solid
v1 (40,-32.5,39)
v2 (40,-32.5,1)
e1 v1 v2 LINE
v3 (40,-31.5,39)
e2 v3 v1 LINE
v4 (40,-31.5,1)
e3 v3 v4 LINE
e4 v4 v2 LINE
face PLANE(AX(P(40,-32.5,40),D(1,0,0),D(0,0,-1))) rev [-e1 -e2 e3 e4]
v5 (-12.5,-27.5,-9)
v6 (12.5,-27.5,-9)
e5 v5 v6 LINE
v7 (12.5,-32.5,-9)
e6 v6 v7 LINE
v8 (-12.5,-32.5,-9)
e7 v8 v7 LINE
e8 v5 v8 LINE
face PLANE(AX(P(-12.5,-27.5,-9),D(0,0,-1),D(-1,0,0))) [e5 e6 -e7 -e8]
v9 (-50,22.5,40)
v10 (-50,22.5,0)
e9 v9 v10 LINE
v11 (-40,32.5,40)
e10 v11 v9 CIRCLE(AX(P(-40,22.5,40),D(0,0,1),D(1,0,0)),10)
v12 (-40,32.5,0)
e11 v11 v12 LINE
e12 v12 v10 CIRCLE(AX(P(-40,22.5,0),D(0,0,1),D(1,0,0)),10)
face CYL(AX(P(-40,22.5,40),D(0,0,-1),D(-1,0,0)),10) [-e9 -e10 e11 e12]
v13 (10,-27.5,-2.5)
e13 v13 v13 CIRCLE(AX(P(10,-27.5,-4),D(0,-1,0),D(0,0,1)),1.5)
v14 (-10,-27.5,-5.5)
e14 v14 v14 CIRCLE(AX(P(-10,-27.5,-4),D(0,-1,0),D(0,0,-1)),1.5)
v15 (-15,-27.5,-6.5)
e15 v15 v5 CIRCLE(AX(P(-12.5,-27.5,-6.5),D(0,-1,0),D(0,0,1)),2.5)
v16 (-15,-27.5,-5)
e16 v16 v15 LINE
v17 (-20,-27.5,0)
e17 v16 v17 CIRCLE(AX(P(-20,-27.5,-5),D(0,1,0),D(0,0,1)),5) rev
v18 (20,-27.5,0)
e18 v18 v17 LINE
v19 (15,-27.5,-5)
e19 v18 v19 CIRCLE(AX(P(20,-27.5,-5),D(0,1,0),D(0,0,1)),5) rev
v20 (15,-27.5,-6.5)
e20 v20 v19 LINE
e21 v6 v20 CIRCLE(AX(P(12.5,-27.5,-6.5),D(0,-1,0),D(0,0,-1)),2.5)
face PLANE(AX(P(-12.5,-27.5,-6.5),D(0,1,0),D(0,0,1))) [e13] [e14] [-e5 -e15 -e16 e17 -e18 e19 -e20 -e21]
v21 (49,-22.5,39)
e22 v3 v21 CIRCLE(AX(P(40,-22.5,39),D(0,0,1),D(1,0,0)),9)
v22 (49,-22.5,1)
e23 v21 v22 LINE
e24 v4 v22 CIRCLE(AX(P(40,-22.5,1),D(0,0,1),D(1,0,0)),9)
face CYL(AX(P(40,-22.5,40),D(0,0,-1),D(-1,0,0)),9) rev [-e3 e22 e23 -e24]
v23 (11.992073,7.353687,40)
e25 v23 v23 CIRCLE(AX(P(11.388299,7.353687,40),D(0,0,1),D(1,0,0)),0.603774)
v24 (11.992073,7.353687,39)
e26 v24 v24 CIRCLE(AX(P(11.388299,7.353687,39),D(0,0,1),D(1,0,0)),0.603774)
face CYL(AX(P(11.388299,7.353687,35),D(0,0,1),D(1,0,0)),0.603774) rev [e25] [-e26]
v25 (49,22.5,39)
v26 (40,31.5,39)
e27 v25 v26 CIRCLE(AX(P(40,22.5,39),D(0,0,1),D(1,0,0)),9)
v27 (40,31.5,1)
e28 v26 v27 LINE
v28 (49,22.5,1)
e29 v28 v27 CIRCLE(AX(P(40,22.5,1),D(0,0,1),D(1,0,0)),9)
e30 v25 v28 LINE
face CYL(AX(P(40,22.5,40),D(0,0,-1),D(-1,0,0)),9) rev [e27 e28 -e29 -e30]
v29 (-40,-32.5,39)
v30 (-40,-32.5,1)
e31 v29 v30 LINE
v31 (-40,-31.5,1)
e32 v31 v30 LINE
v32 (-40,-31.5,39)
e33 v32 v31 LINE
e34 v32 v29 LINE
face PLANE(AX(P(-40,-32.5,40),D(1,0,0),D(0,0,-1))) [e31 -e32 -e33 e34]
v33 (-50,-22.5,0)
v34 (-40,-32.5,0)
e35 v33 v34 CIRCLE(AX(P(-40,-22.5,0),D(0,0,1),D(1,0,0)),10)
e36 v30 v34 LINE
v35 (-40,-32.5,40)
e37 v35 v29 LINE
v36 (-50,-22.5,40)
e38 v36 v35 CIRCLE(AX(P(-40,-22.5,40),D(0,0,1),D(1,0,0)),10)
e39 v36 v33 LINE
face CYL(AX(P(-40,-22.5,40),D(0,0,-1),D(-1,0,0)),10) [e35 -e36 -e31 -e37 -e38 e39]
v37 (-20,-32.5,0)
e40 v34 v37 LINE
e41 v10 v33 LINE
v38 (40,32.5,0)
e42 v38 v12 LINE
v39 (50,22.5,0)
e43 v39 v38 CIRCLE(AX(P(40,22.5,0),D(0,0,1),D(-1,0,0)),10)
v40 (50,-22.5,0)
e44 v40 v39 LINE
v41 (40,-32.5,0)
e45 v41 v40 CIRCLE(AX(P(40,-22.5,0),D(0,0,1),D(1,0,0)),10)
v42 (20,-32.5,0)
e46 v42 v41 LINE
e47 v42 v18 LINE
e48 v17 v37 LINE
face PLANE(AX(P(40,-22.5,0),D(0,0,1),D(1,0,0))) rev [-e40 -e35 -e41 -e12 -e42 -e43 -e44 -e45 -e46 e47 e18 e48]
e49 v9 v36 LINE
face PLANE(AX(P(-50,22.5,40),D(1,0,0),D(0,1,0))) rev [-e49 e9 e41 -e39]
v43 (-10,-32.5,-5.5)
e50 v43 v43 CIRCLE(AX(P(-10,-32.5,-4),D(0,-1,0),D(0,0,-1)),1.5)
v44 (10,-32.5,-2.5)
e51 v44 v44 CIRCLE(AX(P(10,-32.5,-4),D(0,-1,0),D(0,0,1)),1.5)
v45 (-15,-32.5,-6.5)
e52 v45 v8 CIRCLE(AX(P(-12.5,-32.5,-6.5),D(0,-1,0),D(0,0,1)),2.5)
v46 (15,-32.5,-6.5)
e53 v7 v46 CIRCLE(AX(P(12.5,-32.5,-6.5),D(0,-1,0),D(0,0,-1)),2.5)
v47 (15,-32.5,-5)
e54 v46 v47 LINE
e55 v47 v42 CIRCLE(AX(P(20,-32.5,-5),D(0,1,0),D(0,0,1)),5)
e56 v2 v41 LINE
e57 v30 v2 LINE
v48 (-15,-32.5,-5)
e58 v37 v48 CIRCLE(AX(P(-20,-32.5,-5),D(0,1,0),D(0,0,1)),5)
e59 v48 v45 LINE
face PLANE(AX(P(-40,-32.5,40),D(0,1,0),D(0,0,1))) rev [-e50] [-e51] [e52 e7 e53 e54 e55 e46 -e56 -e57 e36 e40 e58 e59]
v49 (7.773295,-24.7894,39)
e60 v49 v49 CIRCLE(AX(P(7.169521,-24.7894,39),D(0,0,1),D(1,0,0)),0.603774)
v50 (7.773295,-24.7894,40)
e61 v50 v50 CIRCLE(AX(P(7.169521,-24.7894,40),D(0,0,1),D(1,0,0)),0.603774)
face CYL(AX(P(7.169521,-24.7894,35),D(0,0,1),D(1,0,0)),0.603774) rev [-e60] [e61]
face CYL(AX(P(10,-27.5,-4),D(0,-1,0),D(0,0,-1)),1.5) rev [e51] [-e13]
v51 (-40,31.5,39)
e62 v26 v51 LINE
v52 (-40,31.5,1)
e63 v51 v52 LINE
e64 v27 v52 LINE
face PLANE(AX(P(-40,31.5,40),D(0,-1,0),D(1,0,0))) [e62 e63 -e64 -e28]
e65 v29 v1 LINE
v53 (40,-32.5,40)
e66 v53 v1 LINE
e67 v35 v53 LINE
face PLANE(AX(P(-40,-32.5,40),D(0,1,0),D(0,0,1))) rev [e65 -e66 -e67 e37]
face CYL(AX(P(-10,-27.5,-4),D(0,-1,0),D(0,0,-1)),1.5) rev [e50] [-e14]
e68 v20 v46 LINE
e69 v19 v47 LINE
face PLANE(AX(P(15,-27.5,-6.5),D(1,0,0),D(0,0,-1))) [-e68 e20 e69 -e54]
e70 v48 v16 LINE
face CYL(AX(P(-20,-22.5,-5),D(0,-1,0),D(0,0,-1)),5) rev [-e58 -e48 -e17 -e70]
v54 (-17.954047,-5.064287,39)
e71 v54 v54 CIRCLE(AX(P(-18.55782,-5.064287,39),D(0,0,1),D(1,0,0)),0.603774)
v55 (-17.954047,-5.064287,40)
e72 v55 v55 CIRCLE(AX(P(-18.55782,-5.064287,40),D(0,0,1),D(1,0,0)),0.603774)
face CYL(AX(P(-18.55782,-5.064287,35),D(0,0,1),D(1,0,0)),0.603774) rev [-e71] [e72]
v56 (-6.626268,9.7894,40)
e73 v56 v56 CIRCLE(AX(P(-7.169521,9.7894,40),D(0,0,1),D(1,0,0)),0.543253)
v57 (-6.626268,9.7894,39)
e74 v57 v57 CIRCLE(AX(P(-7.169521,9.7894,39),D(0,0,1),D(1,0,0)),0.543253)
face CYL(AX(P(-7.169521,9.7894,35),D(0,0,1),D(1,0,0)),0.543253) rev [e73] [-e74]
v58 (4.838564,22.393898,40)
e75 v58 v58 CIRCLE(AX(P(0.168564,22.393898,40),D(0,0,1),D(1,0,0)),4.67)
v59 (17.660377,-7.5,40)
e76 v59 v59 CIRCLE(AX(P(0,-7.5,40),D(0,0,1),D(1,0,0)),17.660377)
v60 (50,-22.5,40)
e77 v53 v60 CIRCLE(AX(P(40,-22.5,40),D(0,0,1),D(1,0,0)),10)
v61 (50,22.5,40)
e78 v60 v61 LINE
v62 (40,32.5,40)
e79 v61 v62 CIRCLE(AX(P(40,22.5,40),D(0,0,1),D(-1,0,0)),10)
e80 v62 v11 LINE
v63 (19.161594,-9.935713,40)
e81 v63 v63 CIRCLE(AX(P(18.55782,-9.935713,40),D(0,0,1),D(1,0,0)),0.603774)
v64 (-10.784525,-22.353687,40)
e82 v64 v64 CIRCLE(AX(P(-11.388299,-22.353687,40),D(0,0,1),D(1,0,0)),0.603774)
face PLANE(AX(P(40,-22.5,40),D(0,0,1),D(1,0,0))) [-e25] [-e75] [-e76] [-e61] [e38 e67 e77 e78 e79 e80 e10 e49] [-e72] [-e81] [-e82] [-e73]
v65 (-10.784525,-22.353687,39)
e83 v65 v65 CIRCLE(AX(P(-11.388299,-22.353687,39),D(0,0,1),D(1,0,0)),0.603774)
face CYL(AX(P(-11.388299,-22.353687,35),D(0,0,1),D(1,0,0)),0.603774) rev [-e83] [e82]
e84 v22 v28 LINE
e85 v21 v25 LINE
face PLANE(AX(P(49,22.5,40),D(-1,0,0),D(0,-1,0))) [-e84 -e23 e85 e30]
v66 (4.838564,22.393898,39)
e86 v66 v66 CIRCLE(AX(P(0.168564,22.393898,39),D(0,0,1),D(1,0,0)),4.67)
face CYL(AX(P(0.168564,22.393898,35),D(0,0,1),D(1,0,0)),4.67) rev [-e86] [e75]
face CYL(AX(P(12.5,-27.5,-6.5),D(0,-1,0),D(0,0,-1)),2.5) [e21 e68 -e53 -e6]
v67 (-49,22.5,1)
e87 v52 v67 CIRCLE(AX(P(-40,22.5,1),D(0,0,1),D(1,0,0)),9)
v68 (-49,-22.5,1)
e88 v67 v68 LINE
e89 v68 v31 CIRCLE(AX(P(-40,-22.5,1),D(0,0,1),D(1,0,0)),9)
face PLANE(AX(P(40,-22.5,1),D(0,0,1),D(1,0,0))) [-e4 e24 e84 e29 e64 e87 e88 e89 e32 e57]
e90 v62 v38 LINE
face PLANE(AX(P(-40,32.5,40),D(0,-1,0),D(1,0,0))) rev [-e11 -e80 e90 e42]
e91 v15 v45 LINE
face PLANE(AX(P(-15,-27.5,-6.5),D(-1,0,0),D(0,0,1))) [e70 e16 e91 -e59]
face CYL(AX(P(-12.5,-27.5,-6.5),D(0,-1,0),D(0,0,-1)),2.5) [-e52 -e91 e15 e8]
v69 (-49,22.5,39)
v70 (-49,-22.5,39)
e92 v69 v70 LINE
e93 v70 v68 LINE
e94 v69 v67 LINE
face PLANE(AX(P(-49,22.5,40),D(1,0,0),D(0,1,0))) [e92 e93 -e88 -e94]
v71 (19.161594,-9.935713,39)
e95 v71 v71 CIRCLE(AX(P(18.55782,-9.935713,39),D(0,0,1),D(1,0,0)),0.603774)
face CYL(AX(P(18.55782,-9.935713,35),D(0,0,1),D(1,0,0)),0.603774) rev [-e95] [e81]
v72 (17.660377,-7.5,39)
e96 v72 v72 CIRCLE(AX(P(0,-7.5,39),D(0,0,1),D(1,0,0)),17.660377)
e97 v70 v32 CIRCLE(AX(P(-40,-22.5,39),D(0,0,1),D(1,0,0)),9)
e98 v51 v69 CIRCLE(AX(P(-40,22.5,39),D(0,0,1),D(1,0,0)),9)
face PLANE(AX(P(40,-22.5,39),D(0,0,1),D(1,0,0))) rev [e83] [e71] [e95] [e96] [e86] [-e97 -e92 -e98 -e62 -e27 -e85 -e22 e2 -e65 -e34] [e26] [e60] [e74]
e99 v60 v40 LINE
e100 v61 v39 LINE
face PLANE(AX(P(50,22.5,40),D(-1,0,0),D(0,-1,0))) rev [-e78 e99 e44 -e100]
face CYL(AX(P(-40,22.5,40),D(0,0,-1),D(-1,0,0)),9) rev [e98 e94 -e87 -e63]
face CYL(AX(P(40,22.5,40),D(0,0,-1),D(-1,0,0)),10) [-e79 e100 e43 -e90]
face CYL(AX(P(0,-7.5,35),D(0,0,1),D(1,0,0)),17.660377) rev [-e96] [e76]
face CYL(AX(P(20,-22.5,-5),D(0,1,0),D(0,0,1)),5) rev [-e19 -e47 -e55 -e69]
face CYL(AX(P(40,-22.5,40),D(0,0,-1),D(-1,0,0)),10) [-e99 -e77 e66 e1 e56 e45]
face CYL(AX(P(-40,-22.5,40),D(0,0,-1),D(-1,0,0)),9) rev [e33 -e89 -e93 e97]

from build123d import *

# Parameters (mm, degrees)
BOSS_EXTRU_1_DEPTH      = 40
COQUE1_START            = 1
COQUE1_DEPTH            = 38
ESQUISSE2_R             = 4.67
ESQUISSE2_R_2           = 17.660377339
ESQUISSE2_R_3           = 0.603773585
ESQUISSE2_R_4           = 0.543253327
ENL_V_MAT_EXTRU_1_DEPTH = 5
ESQUISSE3_R             = 1.5
BOSS_EXTRU_2_DEPTH      = 5
CONG_1_R                = 5


# Read off the part's stored shape, not the designer's step: Coque1
with BuildPart() as part:
    # Esquisse1 → Boss.-Extru.1 (new body)
    with BuildSketch(Plane.XY):
        with BuildLine():
            Line((-40, 32.5), (40, 32.5))
            ThreePointArc((40, 32.5), (47.071067812, 29.571067812), (50, 22.5))
            Line((50, 22.5), (50, -22.5))
            ThreePointArc((50, -22.5), (47.071067812, -29.571067812), (40, -32.5))
            Line((40, -32.5), (-40, -32.5))
            ThreePointArc((-40, -32.5), (-47.071067812, -29.571067812), (-50, -22.5))
            Line((-50, -22.5), (-50, 22.5))
            ThreePointArc((-50, 22.5), (-47.071067812, 29.571067812), (-40, 32.5))
        make_face()
    extrude(amount=BOSS_EXTRU_1_DEPTH)

    # Coque1 outline → Coque1 (cut)
    with BuildSketch(Plane.XY.offset(COQUE1_START)):
        with BuildLine():
            Line((-40, -31.5), (-40, -32.5))
            Line((-40, -32.5), (40, -32.5))
            Line((40, -32.5), (40, -31.5))
            ThreePointArc((40, -31.5), (46.363961031, -28.863961031), (49, -22.5))
            Line((49, -22.5), (49, 22.5))
            ThreePointArc((49, 22.5), (46.363961031, 28.863961031), (40, 31.5))
            Line((40, 31.5), (-40, 31.5))
            ThreePointArc((-40, 31.5), (-46.363961031, 28.863961031), (-49, 22.5))
            Line((-49, 22.5), (-49, -22.5))
            ThreePointArc((-49, -22.5), (-46.363961031, -28.863961031), (-40, -31.5))
        make_face()
    extrude(amount=COQUE1_DEPTH, mode=Mode.SUBTRACT)

    # Esquisse2 → Enlèv. mat.-Extru.1 (cut)
    with BuildSketch(Plane.XY.offset(40)):
        with Locations((0.168563894, 22.39389783)):
            Circle(ESQUISSE2_R)
        with Locations((-2.4e-08, -7.499999903)):
            Circle(ESQUISSE2_R_2)
        with Locations((-18.557820098, -5.064287395)):
            Circle(ESQUISSE2_R_3)
        with Locations((18.557820098, -9.935712605)):
            Circle(ESQUISSE2_R_3)
        with Locations((11.388299042, 7.353687341)):
            Circle(ESQUISSE2_R_3)
        with Locations((-7.169521057, 9.789399947)):
            Circle(ESQUISSE2_R_4)
        with Locations((7.169521057, -24.789399947)):
            Circle(ESQUISSE2_R_3)
        with Locations((-11.388299042, -22.353687341)):
            Circle(ESQUISSE2_R_3)
    extrude(amount=-ENL_V_MAT_EXTRU_1_DEPTH, mode=Mode.SUBTRACT)

    # Esquisse3 → Boss.-Extru.2 (add)
    with BuildSketch(Plane.XZ.offset(32.5)):
        with BuildLine():
            Line((-12.5, -9), (12.5, -9))
            ThreePointArc((12.5, -9), (14.267766953, -8.267766953), (15, -6.5))
            Line((15, -6.5), (15, 1))
            Line((15, 1), (-15, 1))
            Line((-15, 1), (-15, -6.5))
            ThreePointArc((-15, -6.5), (-14.267766953, -8.267766953), (-12.5, -9))
        make_face()
        with Locations(Location((-10, -4, 0), (0, 0, 270))):
            Circle(ESQUISSE3_R, mode=Mode.SUBTRACT)
        with Locations(Location((10, -4, 0), (0, 0, 90))):
            Circle(ESQUISSE3_R, mode=Mode.SUBTRACT)
    extrude(amount=-BOSS_EXTRU_2_DEPTH)

    # Congé1
    cong_1_edges = [part.edges().sort_by_distance(p)[0] for p in [
        (-15, -30, 0),
        (15, -30, 0),
    ]]
    fillet(cong_1_edges, radius=CONG_1_R)


solid = part.part
